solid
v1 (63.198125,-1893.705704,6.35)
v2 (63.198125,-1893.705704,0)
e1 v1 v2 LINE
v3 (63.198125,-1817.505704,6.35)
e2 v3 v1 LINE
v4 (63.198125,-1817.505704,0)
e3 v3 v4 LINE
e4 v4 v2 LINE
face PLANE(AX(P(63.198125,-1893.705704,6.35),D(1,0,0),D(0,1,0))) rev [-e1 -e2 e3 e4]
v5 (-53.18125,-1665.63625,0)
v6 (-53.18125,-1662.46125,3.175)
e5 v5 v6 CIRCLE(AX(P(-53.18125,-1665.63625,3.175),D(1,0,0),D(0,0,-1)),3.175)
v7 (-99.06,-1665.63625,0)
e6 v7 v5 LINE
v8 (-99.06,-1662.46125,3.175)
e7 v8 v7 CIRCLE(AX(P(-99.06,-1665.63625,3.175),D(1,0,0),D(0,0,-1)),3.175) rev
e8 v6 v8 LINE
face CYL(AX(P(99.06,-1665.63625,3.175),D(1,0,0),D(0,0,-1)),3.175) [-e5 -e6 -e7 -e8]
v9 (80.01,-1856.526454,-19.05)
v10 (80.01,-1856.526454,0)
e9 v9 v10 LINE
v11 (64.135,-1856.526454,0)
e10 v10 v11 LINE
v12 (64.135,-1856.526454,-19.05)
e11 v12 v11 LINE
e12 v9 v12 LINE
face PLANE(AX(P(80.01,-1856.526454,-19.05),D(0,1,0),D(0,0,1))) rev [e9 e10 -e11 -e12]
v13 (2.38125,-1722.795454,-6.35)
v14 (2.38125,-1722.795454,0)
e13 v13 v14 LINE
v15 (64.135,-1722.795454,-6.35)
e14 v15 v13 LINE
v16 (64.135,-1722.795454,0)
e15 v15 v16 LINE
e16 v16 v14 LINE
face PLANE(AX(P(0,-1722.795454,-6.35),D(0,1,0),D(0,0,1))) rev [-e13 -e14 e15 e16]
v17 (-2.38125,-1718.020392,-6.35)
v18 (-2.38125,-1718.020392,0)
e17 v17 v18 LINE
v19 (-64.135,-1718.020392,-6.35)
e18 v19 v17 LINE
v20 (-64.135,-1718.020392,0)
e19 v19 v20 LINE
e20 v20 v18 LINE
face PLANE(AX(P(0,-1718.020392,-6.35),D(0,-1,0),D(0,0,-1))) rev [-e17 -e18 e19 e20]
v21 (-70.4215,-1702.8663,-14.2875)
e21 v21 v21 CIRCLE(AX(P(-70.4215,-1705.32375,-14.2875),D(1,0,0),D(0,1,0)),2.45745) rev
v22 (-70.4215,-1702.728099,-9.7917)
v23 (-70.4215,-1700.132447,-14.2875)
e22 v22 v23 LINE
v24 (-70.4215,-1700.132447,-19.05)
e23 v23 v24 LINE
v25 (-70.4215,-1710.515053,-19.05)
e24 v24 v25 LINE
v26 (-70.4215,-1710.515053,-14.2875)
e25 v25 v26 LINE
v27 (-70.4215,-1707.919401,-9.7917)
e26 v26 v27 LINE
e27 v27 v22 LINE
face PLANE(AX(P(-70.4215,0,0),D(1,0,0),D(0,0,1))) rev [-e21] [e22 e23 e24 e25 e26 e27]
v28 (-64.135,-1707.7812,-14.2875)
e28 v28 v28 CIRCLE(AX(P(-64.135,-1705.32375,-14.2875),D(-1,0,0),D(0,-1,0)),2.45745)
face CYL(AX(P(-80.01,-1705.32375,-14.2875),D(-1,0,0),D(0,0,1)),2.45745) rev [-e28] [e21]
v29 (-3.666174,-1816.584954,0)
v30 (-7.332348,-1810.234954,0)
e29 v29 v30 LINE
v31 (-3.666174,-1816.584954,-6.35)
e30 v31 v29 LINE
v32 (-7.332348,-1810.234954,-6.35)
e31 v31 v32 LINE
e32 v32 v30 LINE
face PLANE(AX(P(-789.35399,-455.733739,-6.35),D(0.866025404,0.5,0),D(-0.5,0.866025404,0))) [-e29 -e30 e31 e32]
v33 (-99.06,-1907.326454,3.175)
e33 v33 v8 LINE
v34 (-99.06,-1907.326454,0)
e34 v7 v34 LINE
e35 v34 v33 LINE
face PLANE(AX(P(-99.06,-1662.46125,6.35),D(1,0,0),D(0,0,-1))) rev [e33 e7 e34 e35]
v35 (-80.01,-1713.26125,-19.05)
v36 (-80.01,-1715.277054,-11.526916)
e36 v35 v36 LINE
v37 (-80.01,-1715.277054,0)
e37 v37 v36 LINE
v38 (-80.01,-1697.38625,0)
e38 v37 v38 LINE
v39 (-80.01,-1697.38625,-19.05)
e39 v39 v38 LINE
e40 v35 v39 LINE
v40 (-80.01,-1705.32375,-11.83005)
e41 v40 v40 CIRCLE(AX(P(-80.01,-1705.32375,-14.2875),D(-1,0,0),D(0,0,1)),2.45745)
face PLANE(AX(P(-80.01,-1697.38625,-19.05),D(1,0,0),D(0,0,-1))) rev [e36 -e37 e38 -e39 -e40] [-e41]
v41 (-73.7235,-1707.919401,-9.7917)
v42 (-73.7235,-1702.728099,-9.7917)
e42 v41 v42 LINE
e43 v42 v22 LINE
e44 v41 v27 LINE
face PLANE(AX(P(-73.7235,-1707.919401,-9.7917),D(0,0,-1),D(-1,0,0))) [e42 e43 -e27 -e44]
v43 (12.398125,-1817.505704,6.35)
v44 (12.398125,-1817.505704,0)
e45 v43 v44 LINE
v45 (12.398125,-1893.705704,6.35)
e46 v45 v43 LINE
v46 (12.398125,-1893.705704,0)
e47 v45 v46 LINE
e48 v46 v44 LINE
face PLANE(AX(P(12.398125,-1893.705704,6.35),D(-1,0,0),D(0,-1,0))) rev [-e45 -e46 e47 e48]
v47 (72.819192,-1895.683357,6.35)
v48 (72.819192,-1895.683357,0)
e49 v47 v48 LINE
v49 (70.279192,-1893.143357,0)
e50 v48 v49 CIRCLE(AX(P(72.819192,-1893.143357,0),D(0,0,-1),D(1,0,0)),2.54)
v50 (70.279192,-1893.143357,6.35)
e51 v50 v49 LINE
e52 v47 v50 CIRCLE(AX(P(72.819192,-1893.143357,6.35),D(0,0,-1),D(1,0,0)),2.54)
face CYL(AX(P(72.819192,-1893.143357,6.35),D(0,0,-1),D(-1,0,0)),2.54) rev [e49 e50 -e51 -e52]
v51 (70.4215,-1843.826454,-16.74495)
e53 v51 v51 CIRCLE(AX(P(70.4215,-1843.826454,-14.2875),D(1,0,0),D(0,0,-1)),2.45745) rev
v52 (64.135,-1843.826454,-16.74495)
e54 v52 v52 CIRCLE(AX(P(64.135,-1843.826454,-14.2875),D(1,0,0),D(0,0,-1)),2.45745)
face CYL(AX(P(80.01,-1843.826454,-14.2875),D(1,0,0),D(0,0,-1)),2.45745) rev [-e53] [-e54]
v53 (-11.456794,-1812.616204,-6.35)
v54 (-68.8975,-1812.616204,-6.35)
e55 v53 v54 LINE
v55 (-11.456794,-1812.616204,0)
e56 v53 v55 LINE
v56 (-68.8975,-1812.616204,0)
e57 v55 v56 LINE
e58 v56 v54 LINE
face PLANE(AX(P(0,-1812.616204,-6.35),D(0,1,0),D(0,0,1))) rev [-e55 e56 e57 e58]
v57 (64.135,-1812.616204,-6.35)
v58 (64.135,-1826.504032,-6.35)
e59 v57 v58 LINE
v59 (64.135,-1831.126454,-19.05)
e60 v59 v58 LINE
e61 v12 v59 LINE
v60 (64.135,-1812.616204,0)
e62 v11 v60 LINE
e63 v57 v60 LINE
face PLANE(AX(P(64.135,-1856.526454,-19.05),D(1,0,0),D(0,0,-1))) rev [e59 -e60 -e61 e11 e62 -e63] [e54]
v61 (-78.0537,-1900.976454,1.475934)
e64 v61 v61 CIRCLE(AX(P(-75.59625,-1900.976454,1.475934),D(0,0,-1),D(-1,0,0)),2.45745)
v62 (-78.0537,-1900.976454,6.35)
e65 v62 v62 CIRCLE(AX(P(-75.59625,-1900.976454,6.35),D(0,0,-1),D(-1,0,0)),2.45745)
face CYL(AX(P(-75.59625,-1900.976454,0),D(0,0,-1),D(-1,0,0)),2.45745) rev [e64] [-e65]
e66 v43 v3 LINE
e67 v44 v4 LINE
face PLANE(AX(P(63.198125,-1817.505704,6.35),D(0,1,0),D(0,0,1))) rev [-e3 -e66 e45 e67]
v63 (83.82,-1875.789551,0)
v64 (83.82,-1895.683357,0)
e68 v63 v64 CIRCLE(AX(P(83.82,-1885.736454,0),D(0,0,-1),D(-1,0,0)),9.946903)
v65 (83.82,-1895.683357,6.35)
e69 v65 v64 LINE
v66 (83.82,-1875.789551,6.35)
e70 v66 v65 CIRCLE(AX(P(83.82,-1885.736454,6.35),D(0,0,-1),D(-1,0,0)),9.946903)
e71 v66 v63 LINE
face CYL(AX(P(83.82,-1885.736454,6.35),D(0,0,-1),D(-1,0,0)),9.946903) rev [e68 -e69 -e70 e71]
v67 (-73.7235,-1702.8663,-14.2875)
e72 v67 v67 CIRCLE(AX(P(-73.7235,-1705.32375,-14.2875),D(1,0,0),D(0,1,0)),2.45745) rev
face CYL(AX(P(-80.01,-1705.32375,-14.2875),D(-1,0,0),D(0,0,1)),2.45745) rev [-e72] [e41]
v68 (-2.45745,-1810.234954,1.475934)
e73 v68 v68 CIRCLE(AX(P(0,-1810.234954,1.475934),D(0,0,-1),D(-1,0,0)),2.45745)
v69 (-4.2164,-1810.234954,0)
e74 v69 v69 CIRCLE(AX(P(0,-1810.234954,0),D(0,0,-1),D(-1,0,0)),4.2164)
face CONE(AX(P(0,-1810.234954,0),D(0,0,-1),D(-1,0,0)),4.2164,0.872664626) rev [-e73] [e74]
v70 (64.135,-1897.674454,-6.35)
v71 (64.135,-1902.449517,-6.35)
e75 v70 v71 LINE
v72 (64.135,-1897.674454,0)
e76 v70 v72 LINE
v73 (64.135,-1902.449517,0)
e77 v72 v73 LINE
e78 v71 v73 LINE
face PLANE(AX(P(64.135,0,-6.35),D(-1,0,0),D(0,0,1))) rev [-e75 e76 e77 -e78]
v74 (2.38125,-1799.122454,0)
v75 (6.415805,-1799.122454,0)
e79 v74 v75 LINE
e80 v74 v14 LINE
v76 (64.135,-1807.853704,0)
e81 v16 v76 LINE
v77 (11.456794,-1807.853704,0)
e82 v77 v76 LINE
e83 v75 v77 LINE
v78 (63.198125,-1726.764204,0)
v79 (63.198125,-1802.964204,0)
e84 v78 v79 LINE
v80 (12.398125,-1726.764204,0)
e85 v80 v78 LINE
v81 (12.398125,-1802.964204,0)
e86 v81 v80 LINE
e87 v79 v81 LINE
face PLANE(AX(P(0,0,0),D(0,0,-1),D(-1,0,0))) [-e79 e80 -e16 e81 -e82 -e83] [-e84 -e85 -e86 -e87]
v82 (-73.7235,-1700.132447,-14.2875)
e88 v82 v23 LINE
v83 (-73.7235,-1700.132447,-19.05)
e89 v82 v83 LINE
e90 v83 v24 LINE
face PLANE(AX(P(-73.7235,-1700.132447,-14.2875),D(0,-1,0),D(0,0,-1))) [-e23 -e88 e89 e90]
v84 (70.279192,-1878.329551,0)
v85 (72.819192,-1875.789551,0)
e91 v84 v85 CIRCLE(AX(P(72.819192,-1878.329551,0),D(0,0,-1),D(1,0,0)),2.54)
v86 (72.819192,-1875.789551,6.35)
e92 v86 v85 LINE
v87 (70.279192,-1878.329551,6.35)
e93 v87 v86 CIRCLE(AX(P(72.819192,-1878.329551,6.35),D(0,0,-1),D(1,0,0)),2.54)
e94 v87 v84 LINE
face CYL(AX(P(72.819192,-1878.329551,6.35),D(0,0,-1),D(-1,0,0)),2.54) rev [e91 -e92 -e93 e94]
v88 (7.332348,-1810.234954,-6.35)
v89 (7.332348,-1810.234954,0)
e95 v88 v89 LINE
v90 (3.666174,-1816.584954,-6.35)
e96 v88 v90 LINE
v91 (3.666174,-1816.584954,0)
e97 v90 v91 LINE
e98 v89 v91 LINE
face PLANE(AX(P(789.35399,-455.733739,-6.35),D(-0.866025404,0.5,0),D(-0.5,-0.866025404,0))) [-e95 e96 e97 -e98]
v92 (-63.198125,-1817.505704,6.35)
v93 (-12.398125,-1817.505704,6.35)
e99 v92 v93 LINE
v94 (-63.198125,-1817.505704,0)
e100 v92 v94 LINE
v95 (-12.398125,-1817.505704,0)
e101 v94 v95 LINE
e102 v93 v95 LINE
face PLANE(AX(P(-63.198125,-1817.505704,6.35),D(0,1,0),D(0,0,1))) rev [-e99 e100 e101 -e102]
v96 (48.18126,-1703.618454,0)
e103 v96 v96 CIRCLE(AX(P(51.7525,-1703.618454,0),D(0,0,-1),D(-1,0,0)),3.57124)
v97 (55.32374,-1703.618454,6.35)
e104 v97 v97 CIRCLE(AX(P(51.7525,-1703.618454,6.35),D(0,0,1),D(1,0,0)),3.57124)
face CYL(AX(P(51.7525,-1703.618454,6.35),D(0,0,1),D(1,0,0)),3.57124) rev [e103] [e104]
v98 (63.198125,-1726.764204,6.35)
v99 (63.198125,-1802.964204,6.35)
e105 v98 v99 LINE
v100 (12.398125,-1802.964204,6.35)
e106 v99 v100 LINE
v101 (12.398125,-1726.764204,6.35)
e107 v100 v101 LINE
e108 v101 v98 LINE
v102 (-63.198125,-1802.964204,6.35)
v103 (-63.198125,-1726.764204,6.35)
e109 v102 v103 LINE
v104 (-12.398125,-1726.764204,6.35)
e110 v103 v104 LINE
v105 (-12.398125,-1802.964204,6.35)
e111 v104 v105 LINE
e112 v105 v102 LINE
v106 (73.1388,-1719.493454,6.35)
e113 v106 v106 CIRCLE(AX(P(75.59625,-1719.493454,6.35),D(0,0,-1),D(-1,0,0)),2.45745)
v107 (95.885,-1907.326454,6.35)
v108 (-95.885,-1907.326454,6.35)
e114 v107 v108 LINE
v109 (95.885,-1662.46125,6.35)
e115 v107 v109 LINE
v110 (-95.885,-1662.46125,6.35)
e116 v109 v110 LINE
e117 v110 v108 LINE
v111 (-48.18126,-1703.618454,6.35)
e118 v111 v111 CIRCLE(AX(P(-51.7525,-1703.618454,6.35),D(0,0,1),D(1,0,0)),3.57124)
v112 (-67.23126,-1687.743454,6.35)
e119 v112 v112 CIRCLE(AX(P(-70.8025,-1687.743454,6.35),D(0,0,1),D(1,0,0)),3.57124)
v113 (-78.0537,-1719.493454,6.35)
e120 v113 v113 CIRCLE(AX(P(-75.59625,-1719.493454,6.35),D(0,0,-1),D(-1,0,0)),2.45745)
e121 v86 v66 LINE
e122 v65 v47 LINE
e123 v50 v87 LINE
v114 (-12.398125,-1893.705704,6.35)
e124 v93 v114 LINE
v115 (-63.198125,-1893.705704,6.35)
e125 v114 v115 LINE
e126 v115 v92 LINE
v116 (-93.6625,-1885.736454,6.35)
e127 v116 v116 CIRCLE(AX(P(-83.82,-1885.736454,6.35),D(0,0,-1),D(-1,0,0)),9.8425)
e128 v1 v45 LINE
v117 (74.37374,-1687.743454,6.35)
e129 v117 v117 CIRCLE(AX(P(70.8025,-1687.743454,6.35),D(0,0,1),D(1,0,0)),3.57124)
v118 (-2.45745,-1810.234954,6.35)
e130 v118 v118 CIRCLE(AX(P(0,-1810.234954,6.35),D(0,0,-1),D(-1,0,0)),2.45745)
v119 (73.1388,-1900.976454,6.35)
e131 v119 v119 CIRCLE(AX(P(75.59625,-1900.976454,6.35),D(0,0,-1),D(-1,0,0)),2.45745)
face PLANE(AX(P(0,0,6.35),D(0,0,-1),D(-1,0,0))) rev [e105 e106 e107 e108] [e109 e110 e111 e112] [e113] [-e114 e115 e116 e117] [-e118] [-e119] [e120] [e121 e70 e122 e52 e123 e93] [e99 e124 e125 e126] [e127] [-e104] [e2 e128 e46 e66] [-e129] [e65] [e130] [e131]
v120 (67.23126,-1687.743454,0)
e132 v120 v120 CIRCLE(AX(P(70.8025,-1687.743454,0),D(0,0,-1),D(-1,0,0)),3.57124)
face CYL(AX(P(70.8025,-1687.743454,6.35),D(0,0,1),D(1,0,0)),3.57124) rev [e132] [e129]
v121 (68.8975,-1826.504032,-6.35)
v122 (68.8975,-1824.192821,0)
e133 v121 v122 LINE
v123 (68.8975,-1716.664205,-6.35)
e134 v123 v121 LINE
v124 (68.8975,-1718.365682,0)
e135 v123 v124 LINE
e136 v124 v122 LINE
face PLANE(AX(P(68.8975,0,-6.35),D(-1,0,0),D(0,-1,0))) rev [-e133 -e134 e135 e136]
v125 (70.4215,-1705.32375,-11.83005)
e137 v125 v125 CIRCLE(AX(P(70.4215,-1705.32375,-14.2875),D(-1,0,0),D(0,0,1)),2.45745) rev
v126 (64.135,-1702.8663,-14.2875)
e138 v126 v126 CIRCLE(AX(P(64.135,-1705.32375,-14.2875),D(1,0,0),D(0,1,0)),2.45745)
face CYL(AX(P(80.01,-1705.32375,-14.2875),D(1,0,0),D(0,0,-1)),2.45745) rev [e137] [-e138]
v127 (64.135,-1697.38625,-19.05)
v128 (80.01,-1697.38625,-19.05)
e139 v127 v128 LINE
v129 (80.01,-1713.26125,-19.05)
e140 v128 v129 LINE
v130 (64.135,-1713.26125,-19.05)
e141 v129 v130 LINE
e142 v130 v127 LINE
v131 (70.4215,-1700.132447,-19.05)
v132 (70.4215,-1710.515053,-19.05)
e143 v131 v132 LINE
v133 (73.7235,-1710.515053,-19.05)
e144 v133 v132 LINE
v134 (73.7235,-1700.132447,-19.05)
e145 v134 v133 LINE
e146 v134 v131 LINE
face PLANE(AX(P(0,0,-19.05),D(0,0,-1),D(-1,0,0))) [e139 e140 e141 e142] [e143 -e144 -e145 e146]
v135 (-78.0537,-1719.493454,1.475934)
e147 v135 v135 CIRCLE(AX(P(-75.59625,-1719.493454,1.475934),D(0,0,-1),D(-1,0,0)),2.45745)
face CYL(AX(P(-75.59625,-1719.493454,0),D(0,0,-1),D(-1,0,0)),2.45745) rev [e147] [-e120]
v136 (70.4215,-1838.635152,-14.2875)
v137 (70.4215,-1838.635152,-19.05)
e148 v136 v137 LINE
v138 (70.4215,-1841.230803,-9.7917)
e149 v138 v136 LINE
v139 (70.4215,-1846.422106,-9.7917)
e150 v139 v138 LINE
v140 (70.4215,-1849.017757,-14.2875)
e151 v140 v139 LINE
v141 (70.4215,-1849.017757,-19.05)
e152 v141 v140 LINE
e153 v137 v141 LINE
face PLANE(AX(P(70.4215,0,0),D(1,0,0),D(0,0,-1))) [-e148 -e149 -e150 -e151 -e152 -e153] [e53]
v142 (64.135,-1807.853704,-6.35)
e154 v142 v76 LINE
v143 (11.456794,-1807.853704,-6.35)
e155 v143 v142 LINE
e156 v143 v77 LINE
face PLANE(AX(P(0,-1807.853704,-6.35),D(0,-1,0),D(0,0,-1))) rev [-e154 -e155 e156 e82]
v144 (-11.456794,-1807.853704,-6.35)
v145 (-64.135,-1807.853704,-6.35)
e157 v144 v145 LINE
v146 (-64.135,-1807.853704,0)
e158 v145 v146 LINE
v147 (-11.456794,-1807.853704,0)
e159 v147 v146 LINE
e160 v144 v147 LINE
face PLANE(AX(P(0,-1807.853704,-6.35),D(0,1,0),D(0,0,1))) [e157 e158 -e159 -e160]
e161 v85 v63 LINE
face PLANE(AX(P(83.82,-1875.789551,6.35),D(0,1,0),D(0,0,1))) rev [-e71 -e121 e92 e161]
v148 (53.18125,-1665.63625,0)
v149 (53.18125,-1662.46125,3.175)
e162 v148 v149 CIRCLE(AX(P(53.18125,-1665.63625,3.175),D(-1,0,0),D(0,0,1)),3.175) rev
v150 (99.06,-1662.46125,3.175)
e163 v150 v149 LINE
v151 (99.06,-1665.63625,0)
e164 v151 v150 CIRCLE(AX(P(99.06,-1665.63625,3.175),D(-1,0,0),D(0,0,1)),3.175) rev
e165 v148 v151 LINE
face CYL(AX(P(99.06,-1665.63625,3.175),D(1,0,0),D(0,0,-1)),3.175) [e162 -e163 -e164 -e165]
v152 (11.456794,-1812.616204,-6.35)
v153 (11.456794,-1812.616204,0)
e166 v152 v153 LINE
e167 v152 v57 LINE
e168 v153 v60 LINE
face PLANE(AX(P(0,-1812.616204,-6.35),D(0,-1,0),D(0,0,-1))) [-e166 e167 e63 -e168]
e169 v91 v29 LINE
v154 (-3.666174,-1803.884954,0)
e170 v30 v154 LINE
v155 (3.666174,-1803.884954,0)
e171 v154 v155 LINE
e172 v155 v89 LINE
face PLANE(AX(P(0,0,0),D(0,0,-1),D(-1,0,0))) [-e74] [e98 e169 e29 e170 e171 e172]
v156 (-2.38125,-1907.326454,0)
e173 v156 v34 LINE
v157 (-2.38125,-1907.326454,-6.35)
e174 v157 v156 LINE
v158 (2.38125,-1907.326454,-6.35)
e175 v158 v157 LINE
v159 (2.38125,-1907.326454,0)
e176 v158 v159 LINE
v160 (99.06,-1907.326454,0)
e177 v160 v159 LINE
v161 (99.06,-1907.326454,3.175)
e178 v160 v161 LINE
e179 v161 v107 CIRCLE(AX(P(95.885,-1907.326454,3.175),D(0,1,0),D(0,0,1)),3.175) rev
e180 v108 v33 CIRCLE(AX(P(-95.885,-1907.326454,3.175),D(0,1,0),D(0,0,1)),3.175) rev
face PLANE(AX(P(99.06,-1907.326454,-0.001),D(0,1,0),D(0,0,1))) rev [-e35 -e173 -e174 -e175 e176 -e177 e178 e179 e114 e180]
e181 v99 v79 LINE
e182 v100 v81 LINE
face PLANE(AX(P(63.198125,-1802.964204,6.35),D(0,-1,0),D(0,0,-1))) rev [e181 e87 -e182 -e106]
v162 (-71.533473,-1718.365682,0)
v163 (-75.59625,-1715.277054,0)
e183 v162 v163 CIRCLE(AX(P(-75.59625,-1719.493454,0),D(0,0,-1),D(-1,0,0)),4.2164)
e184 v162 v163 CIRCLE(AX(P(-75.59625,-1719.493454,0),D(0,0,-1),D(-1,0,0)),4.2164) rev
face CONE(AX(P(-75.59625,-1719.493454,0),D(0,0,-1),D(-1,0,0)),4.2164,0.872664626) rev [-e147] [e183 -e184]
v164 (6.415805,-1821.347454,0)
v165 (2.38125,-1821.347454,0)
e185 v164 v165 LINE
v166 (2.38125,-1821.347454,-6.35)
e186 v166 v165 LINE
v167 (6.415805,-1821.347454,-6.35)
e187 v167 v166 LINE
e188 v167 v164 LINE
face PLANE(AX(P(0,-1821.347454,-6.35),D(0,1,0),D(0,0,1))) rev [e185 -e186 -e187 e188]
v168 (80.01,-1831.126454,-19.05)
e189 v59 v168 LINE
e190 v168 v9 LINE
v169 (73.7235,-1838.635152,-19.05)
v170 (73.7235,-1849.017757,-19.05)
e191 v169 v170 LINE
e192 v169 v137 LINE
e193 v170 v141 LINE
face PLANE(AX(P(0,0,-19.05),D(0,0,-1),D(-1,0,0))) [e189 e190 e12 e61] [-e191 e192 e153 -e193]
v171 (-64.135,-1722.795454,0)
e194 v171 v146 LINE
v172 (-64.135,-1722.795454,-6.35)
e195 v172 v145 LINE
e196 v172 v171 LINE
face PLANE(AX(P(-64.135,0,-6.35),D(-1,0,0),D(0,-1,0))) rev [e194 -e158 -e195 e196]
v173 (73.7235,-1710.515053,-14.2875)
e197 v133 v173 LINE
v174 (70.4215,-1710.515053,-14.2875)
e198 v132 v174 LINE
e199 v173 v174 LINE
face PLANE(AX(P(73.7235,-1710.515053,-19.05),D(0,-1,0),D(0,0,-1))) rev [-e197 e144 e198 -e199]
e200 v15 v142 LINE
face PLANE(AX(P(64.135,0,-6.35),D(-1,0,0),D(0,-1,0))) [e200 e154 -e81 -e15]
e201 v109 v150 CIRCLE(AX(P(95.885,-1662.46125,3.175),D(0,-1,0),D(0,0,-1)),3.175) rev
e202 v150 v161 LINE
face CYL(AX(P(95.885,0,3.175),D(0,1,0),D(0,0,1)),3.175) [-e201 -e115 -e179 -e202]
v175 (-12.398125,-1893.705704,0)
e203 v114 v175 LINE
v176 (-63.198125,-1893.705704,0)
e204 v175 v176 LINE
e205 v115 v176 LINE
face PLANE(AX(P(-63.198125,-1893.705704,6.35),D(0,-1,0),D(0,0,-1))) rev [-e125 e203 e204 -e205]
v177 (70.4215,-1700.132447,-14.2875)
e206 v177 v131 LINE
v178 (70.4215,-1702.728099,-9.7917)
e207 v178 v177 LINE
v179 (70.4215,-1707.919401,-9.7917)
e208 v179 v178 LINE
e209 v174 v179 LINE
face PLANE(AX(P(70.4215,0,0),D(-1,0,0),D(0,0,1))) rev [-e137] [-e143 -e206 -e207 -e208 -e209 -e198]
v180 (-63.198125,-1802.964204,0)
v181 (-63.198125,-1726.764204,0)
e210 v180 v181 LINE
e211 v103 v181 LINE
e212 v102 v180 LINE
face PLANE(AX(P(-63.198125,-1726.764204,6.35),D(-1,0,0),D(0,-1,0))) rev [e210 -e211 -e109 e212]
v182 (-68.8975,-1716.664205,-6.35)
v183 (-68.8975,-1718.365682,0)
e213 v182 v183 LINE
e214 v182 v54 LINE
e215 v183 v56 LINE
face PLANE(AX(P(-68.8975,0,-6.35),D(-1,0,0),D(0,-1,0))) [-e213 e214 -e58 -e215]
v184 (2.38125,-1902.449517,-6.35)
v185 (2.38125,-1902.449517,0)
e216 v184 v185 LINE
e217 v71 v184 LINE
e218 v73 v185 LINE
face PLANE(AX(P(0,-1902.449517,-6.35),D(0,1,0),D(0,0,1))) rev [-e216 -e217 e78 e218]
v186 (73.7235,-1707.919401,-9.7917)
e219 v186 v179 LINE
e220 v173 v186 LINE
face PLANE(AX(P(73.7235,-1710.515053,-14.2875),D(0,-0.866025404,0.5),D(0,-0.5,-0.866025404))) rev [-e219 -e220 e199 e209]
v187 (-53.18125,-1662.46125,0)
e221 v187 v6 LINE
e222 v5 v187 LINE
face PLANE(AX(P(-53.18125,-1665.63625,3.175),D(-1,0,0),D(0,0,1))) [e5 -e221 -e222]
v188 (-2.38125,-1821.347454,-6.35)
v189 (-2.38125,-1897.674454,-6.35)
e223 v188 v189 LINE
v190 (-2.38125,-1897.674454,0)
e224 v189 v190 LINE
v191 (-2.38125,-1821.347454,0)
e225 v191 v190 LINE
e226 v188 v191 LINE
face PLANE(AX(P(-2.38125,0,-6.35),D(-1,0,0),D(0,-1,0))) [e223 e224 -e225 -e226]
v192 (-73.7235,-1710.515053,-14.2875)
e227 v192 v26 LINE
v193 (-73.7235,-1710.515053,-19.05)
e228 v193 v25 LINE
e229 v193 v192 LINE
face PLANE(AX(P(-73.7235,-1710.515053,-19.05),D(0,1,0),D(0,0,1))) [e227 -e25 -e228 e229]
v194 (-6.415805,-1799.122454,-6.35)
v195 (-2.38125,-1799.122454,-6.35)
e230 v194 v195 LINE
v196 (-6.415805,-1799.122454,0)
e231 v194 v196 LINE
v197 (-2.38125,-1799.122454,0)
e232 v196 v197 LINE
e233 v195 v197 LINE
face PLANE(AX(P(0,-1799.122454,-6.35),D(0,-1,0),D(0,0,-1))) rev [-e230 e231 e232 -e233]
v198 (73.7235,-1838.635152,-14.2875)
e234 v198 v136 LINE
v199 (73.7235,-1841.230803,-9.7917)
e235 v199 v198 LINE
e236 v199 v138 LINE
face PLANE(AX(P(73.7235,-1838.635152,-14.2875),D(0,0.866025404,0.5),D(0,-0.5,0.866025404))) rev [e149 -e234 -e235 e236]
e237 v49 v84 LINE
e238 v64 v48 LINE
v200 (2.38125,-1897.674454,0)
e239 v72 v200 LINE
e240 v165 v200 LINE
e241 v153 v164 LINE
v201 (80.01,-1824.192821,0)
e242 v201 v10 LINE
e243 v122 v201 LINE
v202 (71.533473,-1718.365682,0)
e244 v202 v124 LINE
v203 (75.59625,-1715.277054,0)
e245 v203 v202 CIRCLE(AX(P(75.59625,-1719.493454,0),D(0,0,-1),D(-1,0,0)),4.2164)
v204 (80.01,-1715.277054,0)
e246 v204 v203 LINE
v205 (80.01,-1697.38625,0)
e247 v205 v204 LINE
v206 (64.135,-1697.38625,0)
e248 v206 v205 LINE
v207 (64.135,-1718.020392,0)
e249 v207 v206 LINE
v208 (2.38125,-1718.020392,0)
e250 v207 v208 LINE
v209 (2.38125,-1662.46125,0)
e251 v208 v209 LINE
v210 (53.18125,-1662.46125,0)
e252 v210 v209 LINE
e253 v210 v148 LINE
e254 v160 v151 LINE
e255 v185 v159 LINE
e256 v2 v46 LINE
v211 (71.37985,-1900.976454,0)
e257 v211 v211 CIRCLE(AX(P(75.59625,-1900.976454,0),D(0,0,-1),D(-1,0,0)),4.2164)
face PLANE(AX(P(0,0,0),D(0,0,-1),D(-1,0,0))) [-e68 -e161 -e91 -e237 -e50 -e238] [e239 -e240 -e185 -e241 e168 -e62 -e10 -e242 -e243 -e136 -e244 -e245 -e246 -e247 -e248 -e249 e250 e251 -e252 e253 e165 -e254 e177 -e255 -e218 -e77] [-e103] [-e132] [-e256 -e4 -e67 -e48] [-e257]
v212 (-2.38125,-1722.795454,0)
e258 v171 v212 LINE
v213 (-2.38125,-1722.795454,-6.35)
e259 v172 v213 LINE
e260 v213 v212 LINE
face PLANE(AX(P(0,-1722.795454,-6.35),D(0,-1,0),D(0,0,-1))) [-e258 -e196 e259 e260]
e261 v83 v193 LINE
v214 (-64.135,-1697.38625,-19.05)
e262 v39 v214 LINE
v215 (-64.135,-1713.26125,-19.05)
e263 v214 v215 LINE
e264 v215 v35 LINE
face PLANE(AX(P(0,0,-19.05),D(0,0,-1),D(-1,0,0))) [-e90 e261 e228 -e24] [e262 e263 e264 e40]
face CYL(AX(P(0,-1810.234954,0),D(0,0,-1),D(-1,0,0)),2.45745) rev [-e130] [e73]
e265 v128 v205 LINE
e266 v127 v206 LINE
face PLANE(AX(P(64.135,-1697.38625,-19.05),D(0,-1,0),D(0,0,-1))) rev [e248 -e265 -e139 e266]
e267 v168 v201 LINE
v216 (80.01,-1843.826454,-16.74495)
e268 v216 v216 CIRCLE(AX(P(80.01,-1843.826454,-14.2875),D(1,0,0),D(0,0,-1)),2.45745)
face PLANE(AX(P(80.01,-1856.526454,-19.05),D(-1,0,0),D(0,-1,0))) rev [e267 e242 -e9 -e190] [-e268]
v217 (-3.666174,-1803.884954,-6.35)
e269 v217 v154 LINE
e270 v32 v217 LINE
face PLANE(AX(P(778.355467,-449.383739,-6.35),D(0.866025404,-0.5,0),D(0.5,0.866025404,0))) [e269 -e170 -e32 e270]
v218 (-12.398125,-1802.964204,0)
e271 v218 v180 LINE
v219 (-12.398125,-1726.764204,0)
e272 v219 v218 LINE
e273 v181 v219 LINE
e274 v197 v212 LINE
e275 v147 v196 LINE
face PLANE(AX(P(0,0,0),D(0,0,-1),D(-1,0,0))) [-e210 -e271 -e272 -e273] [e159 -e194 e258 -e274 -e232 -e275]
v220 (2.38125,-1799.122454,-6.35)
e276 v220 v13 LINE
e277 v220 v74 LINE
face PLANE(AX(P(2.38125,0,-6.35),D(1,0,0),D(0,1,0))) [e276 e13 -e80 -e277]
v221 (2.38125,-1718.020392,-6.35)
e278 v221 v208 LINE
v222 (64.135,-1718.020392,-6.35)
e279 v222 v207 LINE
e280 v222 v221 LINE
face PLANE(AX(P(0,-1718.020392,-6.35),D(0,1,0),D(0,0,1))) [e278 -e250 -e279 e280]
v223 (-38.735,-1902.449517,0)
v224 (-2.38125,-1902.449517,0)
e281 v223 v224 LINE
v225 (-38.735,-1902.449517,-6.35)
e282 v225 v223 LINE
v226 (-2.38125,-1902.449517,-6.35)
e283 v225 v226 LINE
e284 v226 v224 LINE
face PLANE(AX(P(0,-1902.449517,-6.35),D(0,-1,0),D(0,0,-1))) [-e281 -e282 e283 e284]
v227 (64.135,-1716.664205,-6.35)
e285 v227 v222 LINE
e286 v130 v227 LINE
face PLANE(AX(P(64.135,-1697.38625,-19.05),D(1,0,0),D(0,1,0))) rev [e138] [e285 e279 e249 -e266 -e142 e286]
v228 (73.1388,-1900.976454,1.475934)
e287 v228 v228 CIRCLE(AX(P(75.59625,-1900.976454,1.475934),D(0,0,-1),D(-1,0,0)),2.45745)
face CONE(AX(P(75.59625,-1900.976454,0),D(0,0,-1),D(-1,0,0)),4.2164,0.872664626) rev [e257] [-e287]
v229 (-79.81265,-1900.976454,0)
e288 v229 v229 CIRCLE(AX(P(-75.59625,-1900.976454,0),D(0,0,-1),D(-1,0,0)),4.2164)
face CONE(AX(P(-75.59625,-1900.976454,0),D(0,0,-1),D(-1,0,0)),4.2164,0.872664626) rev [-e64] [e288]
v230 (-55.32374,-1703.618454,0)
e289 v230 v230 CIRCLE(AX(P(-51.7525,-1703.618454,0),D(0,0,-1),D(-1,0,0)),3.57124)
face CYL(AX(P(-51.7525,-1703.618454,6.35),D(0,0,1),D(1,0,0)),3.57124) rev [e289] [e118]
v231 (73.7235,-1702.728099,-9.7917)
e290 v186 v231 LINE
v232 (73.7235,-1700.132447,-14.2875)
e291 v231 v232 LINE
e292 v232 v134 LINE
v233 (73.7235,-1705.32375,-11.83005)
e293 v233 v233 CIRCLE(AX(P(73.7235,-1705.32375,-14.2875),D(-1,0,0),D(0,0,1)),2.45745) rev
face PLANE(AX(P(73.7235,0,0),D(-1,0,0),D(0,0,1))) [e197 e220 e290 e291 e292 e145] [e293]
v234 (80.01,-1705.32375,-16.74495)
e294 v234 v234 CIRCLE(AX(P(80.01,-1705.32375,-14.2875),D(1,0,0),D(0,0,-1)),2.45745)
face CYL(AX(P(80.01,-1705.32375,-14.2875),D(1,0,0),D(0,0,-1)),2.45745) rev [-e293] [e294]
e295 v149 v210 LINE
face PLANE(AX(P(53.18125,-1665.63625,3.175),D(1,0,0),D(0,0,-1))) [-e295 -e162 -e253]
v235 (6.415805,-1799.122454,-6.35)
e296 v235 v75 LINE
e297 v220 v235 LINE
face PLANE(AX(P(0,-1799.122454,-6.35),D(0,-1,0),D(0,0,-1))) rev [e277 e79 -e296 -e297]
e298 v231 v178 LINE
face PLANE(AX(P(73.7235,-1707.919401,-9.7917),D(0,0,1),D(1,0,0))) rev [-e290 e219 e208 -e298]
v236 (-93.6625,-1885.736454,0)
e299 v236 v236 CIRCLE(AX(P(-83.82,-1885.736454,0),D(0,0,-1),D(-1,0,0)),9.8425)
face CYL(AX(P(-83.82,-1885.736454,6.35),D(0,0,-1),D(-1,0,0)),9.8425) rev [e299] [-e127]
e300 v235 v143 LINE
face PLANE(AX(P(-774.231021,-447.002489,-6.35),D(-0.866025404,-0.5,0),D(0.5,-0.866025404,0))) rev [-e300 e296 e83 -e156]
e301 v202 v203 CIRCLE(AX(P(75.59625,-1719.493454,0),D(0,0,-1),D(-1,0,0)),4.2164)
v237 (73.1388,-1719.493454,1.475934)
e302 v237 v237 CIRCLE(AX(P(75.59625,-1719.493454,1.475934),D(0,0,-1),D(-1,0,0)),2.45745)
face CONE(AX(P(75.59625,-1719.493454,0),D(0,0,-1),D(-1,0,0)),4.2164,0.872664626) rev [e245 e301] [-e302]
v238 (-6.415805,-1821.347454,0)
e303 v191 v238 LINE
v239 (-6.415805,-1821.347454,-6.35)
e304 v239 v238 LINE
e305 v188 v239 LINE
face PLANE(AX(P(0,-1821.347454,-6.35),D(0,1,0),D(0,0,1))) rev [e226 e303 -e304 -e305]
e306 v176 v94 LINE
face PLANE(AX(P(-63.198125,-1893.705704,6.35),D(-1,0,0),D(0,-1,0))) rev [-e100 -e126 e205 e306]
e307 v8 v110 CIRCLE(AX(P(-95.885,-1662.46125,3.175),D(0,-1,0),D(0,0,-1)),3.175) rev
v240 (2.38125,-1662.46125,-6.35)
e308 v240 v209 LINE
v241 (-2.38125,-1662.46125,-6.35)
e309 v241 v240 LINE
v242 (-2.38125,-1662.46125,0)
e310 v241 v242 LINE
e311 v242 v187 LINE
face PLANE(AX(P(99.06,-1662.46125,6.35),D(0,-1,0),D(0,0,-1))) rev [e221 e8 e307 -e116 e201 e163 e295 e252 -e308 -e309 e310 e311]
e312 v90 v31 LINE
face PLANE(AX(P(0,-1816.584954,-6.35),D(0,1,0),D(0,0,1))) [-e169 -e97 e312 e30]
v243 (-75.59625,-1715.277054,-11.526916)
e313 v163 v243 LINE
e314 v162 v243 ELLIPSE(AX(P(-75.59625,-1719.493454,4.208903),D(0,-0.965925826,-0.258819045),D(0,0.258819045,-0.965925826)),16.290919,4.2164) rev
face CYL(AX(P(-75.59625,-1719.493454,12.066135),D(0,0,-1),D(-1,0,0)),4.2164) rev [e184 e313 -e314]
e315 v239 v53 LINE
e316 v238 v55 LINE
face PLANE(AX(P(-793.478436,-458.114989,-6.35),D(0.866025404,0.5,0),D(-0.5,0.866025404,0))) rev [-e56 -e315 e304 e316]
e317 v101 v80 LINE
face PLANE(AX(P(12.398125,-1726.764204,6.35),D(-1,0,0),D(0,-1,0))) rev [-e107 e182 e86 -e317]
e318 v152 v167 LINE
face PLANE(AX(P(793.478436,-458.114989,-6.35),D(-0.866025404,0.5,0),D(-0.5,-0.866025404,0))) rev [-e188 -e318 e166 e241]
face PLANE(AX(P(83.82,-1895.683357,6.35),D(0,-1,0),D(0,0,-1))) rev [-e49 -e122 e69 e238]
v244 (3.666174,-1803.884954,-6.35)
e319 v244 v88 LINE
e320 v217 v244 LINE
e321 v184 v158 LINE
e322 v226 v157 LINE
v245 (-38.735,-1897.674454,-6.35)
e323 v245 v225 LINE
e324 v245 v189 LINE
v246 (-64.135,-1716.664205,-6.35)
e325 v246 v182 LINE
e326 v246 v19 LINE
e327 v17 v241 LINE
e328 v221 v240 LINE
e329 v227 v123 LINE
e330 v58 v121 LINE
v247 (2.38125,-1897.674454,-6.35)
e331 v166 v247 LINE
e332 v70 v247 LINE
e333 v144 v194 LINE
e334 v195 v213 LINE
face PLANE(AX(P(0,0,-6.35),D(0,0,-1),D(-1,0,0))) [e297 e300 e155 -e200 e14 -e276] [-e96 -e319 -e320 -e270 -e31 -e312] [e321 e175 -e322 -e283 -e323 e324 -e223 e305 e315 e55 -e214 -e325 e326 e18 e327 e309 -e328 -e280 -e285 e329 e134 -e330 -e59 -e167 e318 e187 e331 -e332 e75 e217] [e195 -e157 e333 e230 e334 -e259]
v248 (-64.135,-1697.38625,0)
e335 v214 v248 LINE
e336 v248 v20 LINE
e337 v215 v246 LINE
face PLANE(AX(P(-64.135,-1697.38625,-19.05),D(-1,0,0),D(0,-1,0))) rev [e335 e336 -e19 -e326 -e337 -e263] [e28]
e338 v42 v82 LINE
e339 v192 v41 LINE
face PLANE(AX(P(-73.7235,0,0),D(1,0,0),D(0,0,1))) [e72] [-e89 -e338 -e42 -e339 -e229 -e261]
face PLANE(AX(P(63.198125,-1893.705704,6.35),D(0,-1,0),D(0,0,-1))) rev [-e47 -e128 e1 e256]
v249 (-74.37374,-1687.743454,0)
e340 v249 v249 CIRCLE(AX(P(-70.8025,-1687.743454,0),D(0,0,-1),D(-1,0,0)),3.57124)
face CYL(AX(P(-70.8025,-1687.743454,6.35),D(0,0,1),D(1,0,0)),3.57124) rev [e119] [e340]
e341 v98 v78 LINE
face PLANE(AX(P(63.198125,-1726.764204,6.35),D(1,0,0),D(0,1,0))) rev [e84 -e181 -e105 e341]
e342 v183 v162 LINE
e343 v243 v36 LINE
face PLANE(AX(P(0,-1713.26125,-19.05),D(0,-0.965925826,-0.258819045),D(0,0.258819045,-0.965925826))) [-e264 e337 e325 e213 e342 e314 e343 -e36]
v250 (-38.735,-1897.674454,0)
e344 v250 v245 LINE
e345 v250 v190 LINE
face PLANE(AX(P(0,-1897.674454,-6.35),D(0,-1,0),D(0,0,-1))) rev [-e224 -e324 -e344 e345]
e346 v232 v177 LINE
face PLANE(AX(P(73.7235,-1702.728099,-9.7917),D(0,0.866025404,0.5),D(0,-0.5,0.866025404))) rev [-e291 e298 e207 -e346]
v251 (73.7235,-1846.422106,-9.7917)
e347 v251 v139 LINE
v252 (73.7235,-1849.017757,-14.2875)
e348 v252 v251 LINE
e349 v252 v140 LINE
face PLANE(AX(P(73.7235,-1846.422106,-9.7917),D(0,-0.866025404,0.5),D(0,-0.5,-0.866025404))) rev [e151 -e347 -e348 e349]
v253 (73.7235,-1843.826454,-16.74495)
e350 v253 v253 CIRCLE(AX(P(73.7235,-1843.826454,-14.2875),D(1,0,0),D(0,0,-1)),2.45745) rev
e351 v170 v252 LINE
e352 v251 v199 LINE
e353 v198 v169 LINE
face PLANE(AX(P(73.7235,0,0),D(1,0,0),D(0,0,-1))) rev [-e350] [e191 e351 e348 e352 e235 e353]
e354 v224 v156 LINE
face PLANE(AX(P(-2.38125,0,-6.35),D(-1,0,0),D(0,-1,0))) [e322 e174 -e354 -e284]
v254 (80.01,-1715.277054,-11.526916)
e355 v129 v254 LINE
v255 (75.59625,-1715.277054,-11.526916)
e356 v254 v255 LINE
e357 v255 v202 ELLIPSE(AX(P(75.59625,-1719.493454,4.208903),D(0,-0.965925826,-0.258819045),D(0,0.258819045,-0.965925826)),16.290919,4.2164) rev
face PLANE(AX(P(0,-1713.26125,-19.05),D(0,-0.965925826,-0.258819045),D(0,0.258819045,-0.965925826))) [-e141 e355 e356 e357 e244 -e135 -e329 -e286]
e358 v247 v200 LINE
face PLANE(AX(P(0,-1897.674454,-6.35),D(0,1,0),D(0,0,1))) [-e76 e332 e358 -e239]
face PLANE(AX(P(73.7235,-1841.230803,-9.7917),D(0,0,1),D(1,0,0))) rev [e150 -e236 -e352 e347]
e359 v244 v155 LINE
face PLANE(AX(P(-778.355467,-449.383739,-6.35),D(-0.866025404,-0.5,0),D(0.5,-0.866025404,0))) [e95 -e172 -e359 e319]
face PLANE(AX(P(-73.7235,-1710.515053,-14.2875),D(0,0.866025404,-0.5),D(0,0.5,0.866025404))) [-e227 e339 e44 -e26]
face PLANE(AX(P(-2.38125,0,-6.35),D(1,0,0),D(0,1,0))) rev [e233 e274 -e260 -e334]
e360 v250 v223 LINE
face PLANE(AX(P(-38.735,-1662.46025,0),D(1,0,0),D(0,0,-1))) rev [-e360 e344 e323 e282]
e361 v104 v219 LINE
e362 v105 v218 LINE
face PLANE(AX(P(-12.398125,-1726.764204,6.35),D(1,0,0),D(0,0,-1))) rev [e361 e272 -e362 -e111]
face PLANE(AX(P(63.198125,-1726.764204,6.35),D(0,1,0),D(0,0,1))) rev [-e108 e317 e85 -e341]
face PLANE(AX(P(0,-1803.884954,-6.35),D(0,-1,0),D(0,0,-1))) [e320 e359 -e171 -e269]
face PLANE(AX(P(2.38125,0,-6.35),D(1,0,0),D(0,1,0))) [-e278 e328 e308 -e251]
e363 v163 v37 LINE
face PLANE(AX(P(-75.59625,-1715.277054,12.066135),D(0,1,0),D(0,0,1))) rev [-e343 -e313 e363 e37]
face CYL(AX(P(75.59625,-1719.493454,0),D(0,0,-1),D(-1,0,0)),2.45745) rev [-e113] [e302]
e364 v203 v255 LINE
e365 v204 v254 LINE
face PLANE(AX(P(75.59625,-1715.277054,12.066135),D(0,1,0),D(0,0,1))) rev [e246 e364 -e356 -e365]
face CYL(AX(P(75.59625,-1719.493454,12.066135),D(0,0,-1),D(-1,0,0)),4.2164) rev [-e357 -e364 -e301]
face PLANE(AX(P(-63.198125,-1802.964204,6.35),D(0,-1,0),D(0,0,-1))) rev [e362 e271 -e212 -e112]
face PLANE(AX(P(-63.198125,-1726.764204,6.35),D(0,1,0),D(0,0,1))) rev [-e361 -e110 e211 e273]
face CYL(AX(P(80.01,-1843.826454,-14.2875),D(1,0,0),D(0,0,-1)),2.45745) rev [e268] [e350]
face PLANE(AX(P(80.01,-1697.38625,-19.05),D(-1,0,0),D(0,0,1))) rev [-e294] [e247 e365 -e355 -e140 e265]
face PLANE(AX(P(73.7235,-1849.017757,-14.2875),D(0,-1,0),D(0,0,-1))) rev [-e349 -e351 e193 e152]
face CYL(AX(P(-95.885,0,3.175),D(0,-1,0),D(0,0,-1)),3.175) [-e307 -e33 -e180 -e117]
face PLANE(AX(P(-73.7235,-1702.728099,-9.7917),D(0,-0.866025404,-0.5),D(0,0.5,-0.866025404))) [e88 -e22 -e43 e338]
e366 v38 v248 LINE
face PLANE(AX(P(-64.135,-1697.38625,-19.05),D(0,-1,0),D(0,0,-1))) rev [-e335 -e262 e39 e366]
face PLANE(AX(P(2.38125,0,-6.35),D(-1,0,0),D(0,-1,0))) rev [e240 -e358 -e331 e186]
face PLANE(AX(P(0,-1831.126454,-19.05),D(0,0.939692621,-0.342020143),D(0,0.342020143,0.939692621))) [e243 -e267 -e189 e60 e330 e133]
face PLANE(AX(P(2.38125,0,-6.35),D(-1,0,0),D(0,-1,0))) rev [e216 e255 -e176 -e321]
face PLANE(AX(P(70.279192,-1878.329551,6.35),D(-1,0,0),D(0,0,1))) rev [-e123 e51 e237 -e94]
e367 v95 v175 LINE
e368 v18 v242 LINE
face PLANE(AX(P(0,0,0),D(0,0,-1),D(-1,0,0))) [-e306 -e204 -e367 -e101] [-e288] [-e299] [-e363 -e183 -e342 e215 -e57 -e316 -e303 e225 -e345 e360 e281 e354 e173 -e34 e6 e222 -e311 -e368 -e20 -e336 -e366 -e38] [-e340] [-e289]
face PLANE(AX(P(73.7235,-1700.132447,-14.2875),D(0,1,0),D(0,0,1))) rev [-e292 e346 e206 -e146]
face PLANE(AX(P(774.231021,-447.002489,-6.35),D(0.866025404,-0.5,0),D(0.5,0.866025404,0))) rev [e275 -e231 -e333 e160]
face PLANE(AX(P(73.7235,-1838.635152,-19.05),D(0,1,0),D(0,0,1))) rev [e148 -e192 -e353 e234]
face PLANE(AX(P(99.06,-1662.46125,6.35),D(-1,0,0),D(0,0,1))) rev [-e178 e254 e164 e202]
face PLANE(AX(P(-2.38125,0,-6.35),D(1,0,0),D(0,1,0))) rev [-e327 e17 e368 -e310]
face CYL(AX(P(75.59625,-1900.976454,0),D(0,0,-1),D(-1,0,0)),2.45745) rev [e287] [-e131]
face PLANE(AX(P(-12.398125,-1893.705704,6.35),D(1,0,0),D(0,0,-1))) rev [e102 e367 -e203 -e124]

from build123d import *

# Parameters (mm, degrees)
SKETCH1_W                                         = 198.12
SKETCH1_H                                         = 255.039606789
BOSS_EXTRUDE1_DEPTH                               = 6.35
CSK_FOR_8_FLAT_HEAD_MACHINE_SCREW_100_D           = 4.9149
CSK_FOR_8_FLAT_HEAD_MACHINE_SCREW_100_CSINK_D     = 8.4328
CSK_FOR_8_FLAT_HEAD_MACHINE_SCREW_100_CSINK_ANGLE = 100
CUT_EXTRUDE1_REACH                                = 1922.068
SKETCH6_W                                         = 198.12
SKETCH6_H                                         = 10.174402562
F_1_4_CLEARANCE_HOLE1_D                           = 7.14248
FILLET1_R                                         = 3.175
SKETCH9_R                                         = 9.8425
SKETCH9_W                                         = 50.8
SKETCH9_H                                         = 76.2
CUT_EXTRUDE2_DEPTH                                = 1910.907696631
SKETCH10_W                                        = 15.875
SKETCH10_H                                        = 15.875
SKETCH10_H_2                                      = 25.4
BOSS_EXTRUDE2_DEPTH                               = 19.05
BOSS_EXTRUDE3_DEPTH                               = 6.35
DRAFT1_ANGLE                                      = 20
DRAFT2_START                                      = -80.01
DRAFT2_DEPTH                                      = 15.875
DRAFT2_START_2                                    = 64.135
DRAFT2_2_DEPTH                                    = 15.875
F_8_CLEARANCE_HOLE1_REACH                         = 1917.809
F_8_CLEARANCE_HOLE1_BORE_R                        = 2.45745
CUT_EXTRUDE3_START                                = -19.05
CUT_EXTRUDE3_DEPTH                                = 11.526916
CUT_EXTRUDE4_DEPTH                                = 1.651
CUT_EXTRUDE5_REACH                                = 262.327
SKETCH16_W                                        = 25.4
SKETCH16_H                                        = 6.35
CUT_EXTRUDE6_REACH                                = 1911.992
SKETCH17_W                                        = 15.875
SKETCH17_H                                        = 43.91025
FILLET2_START                                     = -100
FILLET2_DEPTH                                     = 46.81875
FILLET2_START_2                                   = 53.18125
FILLET2_2_DEPTH                                   = 46.81875


with BuildPart() as part:
    # Sketch1 → Boss-Extrude1 (new body)
    with BuildSketch(Plane.XY):
        with Locations((0, -1789.981053539)):
            Rectangle(SKETCH1_W, SKETCH1_H)
    extrude(amount=BOSS_EXTRUDE1_DEPTH)

    # CSK for #8 Flat Head Machine Screw (100)2 (through all)
    with Locations(Plane(origin=(0, 0, 0), x_dir=(-1, 0, 0), z_dir=(0, 0, -1))):
        with Locations((75.59625, -1900.97645438), (-75.59625, -1900.97645438), (75.59625, -1719.49345438), (-75.59625, -1719.49345438), (0, -1810.23495438)):
            CounterSinkHole(CSK_FOR_8_FLAT_HEAD_MACHINE_SCREW_100_D / 2, CSK_FOR_8_FLAT_HEAD_MACHINE_SCREW_100_CSINK_D / 2, counter_sink_angle=CSK_FOR_8_FLAT_HEAD_MACHINE_SCREW_100_CSINK_ANGLE)

    # Sketch6 → Cut-Extrude1 (cut, up to next)
    with BuildSketch(Plane.XY.offset(6.35), mode=Mode.PRIVATE) as cut_extrude1_sk1:
        with Locations((0, -1912.413655653)):
            Rectangle(SKETCH6_W, SKETCH6_H)
    cut_extrude1_tool1 = extrude(cut_extrude1_sk1.sketch, amount=-CUT_EXTRUDE1_REACH, mode=Mode.PRIVATE) & part.part
    add(cut_extrude1_tool1.solids().sort_by_distance((0, -1912.413656, 6.35))[0], mode=Mode.SUBTRACT)

    # 1/4 Clearance Hole1 (through all)
    with Locations(Plane.XY.offset(6.35)):
        with Locations((70.8025, -1687.74345438), (-70.8025, -1687.74345438), (-51.7525, -1703.61845438), (51.7525, -1703.61845438)):
            Hole(F_1_4_CLEARANCE_HOLE1_D / 2)

    # Fillet1
    fillet1_edges = [part.edges().sort_by_distance(p)[0] for p in [
        (-99.06, -1784.893852259, 6.35),
        (99.06, -1784.893852259, 6.35),
    ]]
    fillet(fillet1_edges, radius=FILLET1_R)

    # Sketch9 → Cut-Extrude2 (cut, through all)
    with BuildSketch(Plane(origin=(0, 0, 0), x_dir=(-1, 0, 0), z_dir=(0, 0, -1))):
        with Locations((83.82, -1885.73645438)):
            Circle(SKETCH9_R)
        with Locations((-37.798125, -1855.60570438)):
            Rectangle(SKETCH9_W, SKETCH9_H)
        with Locations((37.798125, -1855.60570438)):
            Rectangle(SKETCH9_W, SKETCH9_H)
        with Locations((37.798125, -1764.86420438)):
            Rectangle(SKETCH9_W, SKETCH9_H)
        with Locations((-37.798125, -1764.86420438)):
            Rectangle(SKETCH9_W, SKETCH9_H)
        with BuildLine():
            Line((-83.82, -1875.789551383), (-72.8191921, -1875.789551383))
            ThreePointArc((-72.8191921, -1875.789551383), (-71.023140876, -1876.533500159), (-70.2791921, -1878.329551383))
            Line((-70.2791921, -1878.329551383), (-70.2791921, -1893.143357377))
            ThreePointArc((-70.2791921, -1893.143357377), (-71.023140876, -1894.939408601), (-72.8191921, -1895.683357377))
            Line((-72.8191921, -1895.683357377), (-83.82, -1895.683357377))
            ThreePointArc((-83.82, -1895.683357377), (-93.766902997, -1885.73645438), (-83.82, -1875.789551383))
        make_face()
    extrude(amount=-CUT_EXTRUDE2_DEPTH, mode=Mode.SUBTRACT)

    # Sketch10 → Boss-Extrude2 (add)
    with BuildSketch(Plane(origin=(0, 0, 0), x_dir=(-1, 0, 0), z_dir=(0, 0, -1))):
        with Locations((-72.0725, -1705.323750137)):
            Rectangle(SKETCH10_W, SKETCH10_H)
        with Locations((72.0725, -1843.82645438)):
            Rectangle(SKETCH10_W, SKETCH10_H_2)
        with Locations((72.0725, -1705.323750137)):
            Rectangle(SKETCH10_W, SKETCH10_H)
        with Locations((-72.0725, -1843.82645438)):
            Rectangle(SKETCH10_W, SKETCH10_H_2)
    extrude(amount=BOSS_EXTRUDE2_DEPTH)

    # Sketch11 → Boss-Extrude3 (add)
    with BuildSketch(Plane(origin=(0, 0, 0), x_dir=(-1, 0, 0), z_dir=(0, 0, -1))):
        Polygon((-64.135, -1718.020391975), (-64.135, -1713.261250137), (-68.8975, -1713.261250137), (-68.8975, -1831.12645438), (-64.135, -1831.12645438), (-64.135, -1812.61620438), (-11.456794404, -1812.61620438), (-6.415804866, -1821.34745438), (-2.38125, -1821.34745438), (-2.38125, -1897.67445438), (-64.135, -1897.67445438), (-64.135, -1902.449516786), (-2.38125, -1902.449516786), (-2.38125, -1907.32645438), (2.38125, -1907.32645438), (2.38125, -1902.449516786), (64.135, -1902.449516786), (64.135, -1897.67445438), (2.38125, -1897.67445438), (2.38125, -1821.34745438), (6.415804866, -1821.34745438), (11.456794404, -1812.61620438), (64.135, -1812.61620438), (64.135, -1831.12645438), (68.8975, -1831.12645438), (68.8975, -1713.261250137), (64.135, -1713.261250137), (64.135, -1718.020391975), (2.38125, -1718.020391975), (2.38125, -1662.461250145), (-2.38125, -1662.461250145), (-2.38125, -1718.020391975), align=None)
        Polygon((-5.95753309, -1812.61620438), (-7.332348419, -1810.23495438), (-5.95753309, -1807.85370438), (-3.666174209, -1803.88495438), (3.666174209, -1803.88495438), (7.332348419, -1810.23495438), (3.666174209, -1816.58495438), (-3.666174209, -1816.58495438), align=None, mode=Mode.SUBTRACT)
        Polygon((-64.135, -1807.85370438), (-64.135, -1722.79545438), (-2.38125, -1722.79545438), (-2.38125, -1799.12245438), (-6.415804866, -1799.12245438), (-11.456794404, -1807.85370438), align=None, mode=Mode.SUBTRACT)
        Polygon((64.135, -1807.85370438), (11.456794404, -1807.85370438), (6.415804866, -1799.12245438), (2.38125, -1799.12245438), (2.38125, -1722.79545438), (64.135, -1722.79545438), align=None, mode=Mode.SUBTRACT)
    extrude(amount=BOSS_EXTRUDE3_DEPTH)

    # Draft1
    draft1_faces = [part.faces().sort_by_distance(p)[0] for p in [
        (72.689861111, -1831.12645438, -10.230555556),
        (-72.689861111, -1831.12645438, -10.230555556),
    ]]
    draft(draft1_faces, Plane(origin=(0, 0, -19.05), x_dir=(-1, 0, 0), z_dir=(0, 0, -1)), DRAFT1_ANGLE)

    # Draft2: read off the stored shape, not the designer's step
    # Draft2 outline → Draft2 (add)
    with BuildSketch(Plane.YZ.offset(DRAFT2_START)):
        Polygon((-1718.365682253, 0), (-1713.261250137, -19.05), (-1713.261250137, 0), align=None)
    extrude(amount=DRAFT2_DEPTH)

    # Draft2 2 outline → Draft2 2 (add)
    with BuildSketch(Plane.YZ.offset(DRAFT2_START_2)):
        Polygon((-1718.365682253, 0), (-1713.261250137, -19.05), (-1713.261250137, 0), align=None)
    extrude(amount=DRAFT2_2_DEPTH)

    # #8 Clearance Hole1 bore → #8 Clearance Hole1 (cut, up to next)
    with BuildSketch(Plane(origin=(80.01, 0, 0), x_dir=(0, 0, -1), z_dir=(1, 0, 0)), mode=Mode.PRIVATE) as f_8_clearance_hole1_sk1:
        with Locations((14.2875, -1843.82645438)):
            Circle(F_8_CLEARANCE_HOLE1_BORE_R)
    f_8_clearance_hole1_tool1 = extrude(f_8_clearance_hole1_sk1.sketch, amount=-F_8_CLEARANCE_HOLE1_REACH, mode=Mode.PRIVATE) & part.part
    # #8 Clearance Hole1 bore → #8 Clearance Hole1 (cut, up to next)
    with BuildSketch(Plane(origin=(80.01, 0, 0), x_dir=(0, 0, -1), z_dir=(1, 0, 0)), mode=Mode.PRIVATE) as f_8_clearance_hole1_sk2:
        with Locations((14.2875, -1705.323750137)):
            Circle(F_8_CLEARANCE_HOLE1_BORE_R)
    f_8_clearance_hole1_tool2 = extrude(f_8_clearance_hole1_sk2.sketch, amount=-F_8_CLEARANCE_HOLE1_REACH, mode=Mode.PRIVATE) & part.part
    f_8_clearance_hole1_1 = f_8_clearance_hole1_tool1.solids().sort_by_distance((80.01, -1843.826454, -14.2875))[0]
    add(f_8_clearance_hole1_1, mode=Mode.SUBTRACT)
    f_8_clearance_hole1_2 = f_8_clearance_hole1_tool2.solids().sort_by_distance((80.01, -1705.32375, -14.2875))[0]
    add(f_8_clearance_hole1_2, mode=Mode.SUBTRACT)
    f_8_clearance_hole1 = f_8_clearance_hole1_1 + f_8_clearance_hole1_2  # #8 Clearance Hole1 as one shape, for the pattern or mirror that repeats it

    # Sketch14 → Cut-Extrude3 (cut)
    with BuildSketch(Plane(origin=(0, 0, -19.05), x_dir=(-1, 0, 0), z_dir=(0, 0, -1)).offset(CUT_EXTRUDE3_START)):
        with BuildLine():
            Line((75.59625, -1715.27705438), (80.01, -1715.27705438))
            Line((80.01, -1715.27705438), (80.01, -1723.70985438))
            Line((80.01, -1723.70985438), (75.59625, -1723.70985438))
            ThreePointArc((75.59625, -1723.70985438), (71.37985, -1719.49345438), (75.59625, -1715.27705438))
        make_face()
        with BuildLine():
            Line((-80.01, -1723.70985438), (-75.59625, -1723.70985438))
            ThreePointArc((-75.59625, -1723.70985438), (-71.37985, -1719.49345438), (-75.59625, -1715.27705438))
            Line((-75.59625, -1715.27705438), (-80.01, -1715.27705438))
            Line((-80.01, -1715.27705438), (-80.01, -1723.70985438))
        make_face()
    extrude(amount=CUT_EXTRUDE3_DEPTH, mode=Mode.SUBTRACT)

    # Sketch15 → Cut-Extrude4 (cut, symmetric)
    with BuildSketch(Plane.ZY.offset(-72.0725)):
        Polygon((-9.7917, -1707.919401478), (-9.7917, -1702.728098797), (-14.2875, -1700.132447457), (-19.05, -1700.132447457), (-19.05, -1710.515052818), (-14.2875, -1710.515052818), align=None)
        Polygon((-19.05, -1838.6351517), (-14.2875, -1838.6351517), (-9.7917, -1841.23080304), (-9.7917, -1846.42210572), (-14.2875, -1849.01775706), (-19.05, -1849.01775706), align=None)
    cut_extrude4 = extrude(amount=CUT_EXTRUDE4_DEPTH, both=True, mode=Mode.SUBTRACT)

    # Mirror1: #8 Clearance Hole1, Cut-Extrude4 across plane
    add(f_8_clearance_hole1.mirror(Plane(origin=(0, 0, 0), x_dir=(0, 0, 1), z_dir=(1, 0, 0))), mode=Mode.SUBTRACT)
    add(cut_extrude4.mirror(Plane(origin=(0, 0, 0), x_dir=(0, 0, 1), z_dir=(1, 0, 0))), mode=Mode.SUBTRACT)

    # Sketch16 → Cut-Extrude5 (cut, up to next)
    with BuildSketch(Plane.XZ.offset(1902.449516786), mode=Mode.PRIVATE) as cut_extrude5_sk1:
        with Locations((-51.435, -3.175)):
            Rectangle(SKETCH16_W, SKETCH16_H)
    cut_extrude5_tool1 = extrude(cut_extrude5_sk1.sketch, amount=-CUT_EXTRUDE5_REACH, mode=Mode.PRIVATE) & part.part
    add(cut_extrude5_tool1.solids().sort_by_distance((-51.435, -1902.449517, -3.175))[0], mode=Mode.SUBTRACT)

    # Sketch17 → Cut-Extrude6 (cut, up to next)
    with BuildSketch(Plane(origin=(0, 0, 0), x_dir=(-1, 0, 0), z_dir=(0, 0, -1)), mode=Mode.PRIVATE) as cut_extrude6_sk1:
        with Locations((72.0725, -1834.57132938)):
            Rectangle(SKETCH17_W, SKETCH17_H)
    cut_extrude6_tool1 = extrude(cut_extrude6_sk1.sketch, amount=CUT_EXTRUDE6_REACH, mode=Mode.PRIVATE) & part.part
    add(cut_extrude6_tool1.solids().sort_by_distance((-72.0725, -1834.571329, 0))[0], mode=Mode.SUBTRACT)

    # Fillet2: read off the stored shape, not the designer's step
    # Fillet2 outline → Fillet2 (cut)
    with BuildSketch(Plane.YZ.offset(FILLET2_START)):
        with BuildLine():
            ThreePointArc((-1662.461250145, 3.175), (-1663.391186115, 0.92993597), (-1665.636250145, 0))
            Line((-1665.636250145, 0), (-1662.461250145, 0))
            Line((-1662.461250145, 0), (-1662.461250145, 3.175))
        make_face()
    extrude(amount=FILLET2_DEPTH, mode=Mode.SUBTRACT)

    # Fillet2 2 outline → Fillet2 2 (cut)
    with BuildSketch(Plane.YZ.offset(FILLET2_START_2)):
        with BuildLine():
            ThreePointArc((-1662.461250145, 3.175), (-1663.391186115, 0.92993597), (-1665.636250145, 0))
            Line((-1665.636250145, 0), (-1662.461250145, 0))
            Line((-1662.461250145, 0), (-1662.461250145, 3.175))
        make_face()
    extrude(amount=FILLET2_2_DEPTH, mode=Mode.SUBTRACT)


solid = part.part
